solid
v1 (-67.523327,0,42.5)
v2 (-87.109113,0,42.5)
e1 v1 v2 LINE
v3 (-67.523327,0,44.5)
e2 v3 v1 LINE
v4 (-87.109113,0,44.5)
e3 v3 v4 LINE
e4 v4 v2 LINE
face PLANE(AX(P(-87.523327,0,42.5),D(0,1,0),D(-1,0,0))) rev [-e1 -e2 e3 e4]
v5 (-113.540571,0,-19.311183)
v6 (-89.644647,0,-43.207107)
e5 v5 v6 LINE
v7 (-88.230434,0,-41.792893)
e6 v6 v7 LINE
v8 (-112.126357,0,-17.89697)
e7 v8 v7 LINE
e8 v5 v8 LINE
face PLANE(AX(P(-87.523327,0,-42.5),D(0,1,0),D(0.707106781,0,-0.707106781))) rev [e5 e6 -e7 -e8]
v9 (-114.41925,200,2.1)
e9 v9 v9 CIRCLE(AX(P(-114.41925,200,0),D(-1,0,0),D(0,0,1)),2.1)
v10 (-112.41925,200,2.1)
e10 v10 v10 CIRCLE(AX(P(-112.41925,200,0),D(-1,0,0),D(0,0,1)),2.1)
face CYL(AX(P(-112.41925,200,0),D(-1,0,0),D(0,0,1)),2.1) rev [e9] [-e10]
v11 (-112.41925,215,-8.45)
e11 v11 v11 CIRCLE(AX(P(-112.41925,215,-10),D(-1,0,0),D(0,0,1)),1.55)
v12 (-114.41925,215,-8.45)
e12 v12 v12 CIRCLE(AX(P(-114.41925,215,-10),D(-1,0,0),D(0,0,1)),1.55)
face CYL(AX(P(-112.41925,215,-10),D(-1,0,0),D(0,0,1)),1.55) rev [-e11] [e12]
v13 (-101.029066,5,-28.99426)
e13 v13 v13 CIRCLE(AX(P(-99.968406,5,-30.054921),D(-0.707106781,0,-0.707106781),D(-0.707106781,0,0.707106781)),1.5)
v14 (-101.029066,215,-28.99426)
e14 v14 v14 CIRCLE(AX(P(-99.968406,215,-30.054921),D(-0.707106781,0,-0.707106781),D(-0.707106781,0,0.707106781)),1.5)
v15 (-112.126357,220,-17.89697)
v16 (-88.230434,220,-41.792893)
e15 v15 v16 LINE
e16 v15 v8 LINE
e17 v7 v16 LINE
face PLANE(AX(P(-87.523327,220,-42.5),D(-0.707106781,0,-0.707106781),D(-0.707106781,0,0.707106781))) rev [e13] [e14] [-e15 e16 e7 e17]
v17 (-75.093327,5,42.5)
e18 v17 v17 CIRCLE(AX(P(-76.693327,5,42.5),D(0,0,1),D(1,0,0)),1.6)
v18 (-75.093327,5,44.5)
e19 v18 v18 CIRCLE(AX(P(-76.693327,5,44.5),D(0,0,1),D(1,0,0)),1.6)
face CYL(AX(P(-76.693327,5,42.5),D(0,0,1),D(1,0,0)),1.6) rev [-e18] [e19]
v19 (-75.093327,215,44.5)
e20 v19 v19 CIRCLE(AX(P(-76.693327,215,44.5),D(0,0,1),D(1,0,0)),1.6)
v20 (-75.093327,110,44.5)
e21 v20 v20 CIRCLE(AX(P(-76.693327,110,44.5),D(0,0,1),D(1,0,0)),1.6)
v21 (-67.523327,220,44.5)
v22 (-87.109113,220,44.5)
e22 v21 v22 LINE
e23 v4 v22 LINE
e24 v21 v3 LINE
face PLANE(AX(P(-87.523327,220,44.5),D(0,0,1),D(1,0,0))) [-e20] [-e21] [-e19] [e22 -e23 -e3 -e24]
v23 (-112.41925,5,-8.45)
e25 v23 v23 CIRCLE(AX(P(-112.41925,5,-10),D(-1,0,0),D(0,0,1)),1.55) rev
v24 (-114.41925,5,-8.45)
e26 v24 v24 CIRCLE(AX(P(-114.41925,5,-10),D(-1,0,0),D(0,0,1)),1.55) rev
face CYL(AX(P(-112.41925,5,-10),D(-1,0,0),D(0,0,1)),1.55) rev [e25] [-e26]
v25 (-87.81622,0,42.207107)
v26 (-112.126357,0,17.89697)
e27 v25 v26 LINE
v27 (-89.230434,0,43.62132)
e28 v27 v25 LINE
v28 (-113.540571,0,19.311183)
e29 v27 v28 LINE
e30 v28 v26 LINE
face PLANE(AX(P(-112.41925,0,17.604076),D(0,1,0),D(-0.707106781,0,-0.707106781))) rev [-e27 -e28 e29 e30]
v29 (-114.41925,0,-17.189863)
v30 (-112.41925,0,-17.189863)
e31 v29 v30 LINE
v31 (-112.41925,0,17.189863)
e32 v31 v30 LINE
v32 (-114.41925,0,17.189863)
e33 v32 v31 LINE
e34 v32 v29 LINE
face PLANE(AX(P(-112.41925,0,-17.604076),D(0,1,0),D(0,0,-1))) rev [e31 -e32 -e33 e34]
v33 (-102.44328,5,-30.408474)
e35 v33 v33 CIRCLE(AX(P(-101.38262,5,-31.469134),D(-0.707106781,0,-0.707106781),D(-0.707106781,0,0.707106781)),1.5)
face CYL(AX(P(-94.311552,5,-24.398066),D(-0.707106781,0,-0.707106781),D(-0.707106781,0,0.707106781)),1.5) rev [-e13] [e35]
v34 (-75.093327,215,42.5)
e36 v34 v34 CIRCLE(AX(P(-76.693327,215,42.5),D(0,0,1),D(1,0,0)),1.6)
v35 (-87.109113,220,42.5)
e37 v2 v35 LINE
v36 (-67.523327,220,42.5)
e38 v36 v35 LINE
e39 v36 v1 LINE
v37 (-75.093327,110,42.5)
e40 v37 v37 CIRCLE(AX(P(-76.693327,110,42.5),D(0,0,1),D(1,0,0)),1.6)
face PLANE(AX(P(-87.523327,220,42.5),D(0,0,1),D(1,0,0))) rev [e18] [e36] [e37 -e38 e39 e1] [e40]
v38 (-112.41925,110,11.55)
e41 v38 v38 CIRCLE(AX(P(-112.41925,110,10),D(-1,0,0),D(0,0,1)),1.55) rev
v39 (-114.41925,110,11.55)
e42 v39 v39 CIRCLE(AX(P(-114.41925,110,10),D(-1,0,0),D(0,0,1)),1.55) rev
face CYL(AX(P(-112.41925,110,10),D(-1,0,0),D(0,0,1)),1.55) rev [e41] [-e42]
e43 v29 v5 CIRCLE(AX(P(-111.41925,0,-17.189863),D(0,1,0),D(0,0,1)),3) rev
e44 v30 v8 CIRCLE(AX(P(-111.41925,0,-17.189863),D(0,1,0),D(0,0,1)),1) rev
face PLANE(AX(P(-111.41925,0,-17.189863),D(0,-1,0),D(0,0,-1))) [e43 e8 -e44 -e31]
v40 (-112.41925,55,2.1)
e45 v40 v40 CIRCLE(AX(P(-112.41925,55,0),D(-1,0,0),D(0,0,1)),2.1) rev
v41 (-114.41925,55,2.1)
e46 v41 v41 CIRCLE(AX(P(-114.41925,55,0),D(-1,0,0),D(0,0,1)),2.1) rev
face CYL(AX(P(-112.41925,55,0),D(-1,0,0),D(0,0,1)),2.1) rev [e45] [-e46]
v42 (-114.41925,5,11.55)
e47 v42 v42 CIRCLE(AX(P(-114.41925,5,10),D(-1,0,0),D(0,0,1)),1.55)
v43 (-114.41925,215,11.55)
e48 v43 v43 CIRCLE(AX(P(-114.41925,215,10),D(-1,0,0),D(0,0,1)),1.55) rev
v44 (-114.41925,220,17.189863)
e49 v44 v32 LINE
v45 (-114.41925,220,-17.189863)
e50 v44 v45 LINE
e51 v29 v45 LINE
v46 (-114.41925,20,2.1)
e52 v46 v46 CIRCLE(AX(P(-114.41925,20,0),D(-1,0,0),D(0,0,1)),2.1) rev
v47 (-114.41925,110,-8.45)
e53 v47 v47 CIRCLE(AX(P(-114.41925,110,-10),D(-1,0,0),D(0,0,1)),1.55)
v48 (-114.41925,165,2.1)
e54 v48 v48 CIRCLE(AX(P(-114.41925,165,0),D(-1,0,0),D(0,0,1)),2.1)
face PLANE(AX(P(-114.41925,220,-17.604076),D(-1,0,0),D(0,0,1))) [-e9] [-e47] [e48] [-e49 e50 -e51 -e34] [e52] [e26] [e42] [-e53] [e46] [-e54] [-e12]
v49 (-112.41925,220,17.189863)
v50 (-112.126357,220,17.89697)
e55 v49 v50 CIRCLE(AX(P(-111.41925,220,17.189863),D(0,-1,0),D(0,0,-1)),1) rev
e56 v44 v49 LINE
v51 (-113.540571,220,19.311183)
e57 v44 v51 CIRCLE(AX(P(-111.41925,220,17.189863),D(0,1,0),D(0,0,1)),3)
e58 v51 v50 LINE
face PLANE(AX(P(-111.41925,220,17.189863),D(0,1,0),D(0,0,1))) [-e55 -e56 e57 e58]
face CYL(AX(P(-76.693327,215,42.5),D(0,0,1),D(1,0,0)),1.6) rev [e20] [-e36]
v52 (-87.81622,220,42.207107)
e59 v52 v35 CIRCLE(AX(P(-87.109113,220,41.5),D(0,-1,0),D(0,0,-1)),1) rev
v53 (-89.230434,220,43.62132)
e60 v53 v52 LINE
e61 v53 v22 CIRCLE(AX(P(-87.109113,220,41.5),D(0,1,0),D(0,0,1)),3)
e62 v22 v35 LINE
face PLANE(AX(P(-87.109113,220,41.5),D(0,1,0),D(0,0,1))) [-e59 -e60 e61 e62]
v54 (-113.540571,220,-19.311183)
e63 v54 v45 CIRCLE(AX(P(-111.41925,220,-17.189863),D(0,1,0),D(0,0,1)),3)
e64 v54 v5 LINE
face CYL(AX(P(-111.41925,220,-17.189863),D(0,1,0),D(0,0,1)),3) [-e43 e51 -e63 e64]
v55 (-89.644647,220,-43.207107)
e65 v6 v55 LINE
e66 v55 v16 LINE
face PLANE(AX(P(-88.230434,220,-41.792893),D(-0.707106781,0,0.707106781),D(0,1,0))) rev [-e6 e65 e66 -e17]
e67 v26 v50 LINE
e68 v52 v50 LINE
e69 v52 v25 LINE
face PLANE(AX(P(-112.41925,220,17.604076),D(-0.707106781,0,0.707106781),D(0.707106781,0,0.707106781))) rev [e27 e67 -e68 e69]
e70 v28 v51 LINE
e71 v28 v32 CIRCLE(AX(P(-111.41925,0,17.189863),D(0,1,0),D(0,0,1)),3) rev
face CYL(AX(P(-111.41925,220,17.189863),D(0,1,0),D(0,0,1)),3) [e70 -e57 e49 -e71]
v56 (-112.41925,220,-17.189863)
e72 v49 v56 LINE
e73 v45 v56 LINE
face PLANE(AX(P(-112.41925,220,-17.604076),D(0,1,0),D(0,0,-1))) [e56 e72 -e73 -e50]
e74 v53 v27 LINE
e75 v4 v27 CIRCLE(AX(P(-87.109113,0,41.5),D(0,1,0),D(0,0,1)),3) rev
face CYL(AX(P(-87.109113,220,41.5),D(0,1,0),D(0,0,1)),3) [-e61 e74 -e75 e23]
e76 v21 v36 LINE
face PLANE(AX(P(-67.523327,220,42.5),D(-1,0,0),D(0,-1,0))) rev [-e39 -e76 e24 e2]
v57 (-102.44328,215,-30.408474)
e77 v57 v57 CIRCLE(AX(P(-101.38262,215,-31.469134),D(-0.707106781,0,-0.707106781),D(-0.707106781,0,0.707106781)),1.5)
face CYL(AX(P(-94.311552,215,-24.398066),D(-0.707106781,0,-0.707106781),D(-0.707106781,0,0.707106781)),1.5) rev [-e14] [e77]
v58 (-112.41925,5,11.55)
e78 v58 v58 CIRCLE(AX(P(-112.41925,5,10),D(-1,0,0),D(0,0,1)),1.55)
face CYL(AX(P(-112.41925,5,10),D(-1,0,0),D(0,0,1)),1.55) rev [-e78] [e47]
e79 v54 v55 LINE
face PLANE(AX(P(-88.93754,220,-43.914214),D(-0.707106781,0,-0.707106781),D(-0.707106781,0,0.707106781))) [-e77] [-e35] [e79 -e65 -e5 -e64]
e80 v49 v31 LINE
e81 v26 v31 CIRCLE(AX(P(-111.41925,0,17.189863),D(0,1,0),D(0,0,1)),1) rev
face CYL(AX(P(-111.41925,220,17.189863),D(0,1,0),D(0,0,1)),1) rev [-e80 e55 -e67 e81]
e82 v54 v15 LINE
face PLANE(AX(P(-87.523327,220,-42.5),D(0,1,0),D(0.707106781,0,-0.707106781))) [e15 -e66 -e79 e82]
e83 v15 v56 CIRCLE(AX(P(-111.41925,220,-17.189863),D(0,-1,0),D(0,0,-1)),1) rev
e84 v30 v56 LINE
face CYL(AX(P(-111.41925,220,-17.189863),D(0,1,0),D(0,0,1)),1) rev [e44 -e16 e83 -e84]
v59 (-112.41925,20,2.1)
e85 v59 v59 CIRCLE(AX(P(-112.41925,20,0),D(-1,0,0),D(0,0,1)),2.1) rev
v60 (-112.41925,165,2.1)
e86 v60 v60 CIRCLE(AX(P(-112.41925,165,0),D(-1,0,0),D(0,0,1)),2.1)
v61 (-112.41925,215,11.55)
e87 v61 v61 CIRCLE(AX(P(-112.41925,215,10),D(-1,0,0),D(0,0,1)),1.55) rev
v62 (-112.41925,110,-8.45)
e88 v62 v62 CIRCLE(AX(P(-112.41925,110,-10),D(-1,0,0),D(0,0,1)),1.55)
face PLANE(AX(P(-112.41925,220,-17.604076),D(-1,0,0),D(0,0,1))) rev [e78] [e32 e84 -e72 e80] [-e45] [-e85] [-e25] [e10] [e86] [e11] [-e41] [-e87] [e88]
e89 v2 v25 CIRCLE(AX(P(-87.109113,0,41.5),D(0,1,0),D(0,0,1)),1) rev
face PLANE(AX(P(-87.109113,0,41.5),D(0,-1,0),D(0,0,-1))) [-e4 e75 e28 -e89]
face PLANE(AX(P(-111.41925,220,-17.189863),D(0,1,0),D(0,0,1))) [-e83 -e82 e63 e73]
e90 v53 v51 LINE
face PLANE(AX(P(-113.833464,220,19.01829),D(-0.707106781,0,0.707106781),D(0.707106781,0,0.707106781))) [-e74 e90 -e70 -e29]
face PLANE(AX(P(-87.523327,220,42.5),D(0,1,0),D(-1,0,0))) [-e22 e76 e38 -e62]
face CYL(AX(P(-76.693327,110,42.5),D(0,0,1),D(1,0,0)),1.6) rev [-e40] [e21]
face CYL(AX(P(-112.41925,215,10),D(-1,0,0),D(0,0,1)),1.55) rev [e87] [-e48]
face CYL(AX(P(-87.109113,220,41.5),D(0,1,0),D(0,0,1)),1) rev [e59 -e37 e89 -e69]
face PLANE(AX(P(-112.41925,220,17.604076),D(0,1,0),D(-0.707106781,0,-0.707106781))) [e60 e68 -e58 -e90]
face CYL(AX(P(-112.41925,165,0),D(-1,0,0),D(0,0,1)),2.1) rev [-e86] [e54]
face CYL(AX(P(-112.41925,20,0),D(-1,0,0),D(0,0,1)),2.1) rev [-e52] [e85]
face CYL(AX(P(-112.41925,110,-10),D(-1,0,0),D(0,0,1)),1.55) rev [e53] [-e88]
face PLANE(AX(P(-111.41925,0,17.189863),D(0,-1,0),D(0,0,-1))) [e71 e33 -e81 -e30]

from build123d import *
from build123d.topology import SkipClean

# Parameters (mm, degrees)
EXTRUDE_1_DEPTH             = 220
SKETCH_3_R                  = 1.55
SKETCH_3_R_2                = 2.1
CUT_EXTRUDE_1_DEPTH         = 10
SKETCH_6_R                  = 1.6
CUT_EXTRUDE_2_DEPTH         = 10
CHAMFER_1_SIZE              = 1
CHAMFER_1_SIZE2             = 0.707106781
SHEET_START                 = -114.419250373
SHEET_METAL_2_OUTLINE_W     = 220
SHEET_METAL_2_OUTLINE_H     = 86.5
SHEET_METAL_2_OUTLINE_R     = 1.55
SHEET_METAL_2_OUTLINE_R_2   = 2.1
SHEET_METAL_2_DEPTH         = 26.274603255
SHEET_START_2               = -87.816219993
SHEET_METAL_2_2_OUTLINE_W   = 220
SHEET_METAL_2_2_OUTLINE_H   = 87
SHEET_METAL_2_2_OUTLINE_R   = 1.55
SHEET_METAL_2_2_OUTLINE_R_2 = 2.1
SHEET_METAL_2_2_DEPTH       = 0.483052927
SHEET_START_3               = -89.230433555
SHEET_METAL_2_3_OUTLINE_W   = 220
SHEET_METAL_2_3_OUTLINE_H   = 0.5
SHEET_METAL_2_3_DEPTH       = 21.707106781
SHEET_METAL_2_4_DEPTH       = 220
SHEET_METAL_2_5_DEPTH       = 220
SHEET_START_4               = 44
SHEET_METAL_2_6_OUTLINE_R   = 1.6
SHEET_METAL_2_6_DEPTH       = 0.5
SKETCH_7_R                  = 1.5
CUT_EXTRUDE_3_DEPTH         = 10


with BuildPart() as part:
    # 草图2 → 凸台-拉伸1 (new body)
    with BuildSketch(Plane(origin=(0, 0, 0), x_dir=(1, 0, 0), z_dir=(0, 1, 0))):
        Polygon((-87.523326774, 42.5), (-112.419250373, 17.604076401), (-112.419250373, -17.604076401), (-87.523326774, -42.5), (-67.523326774, -42.5), (-67.523326774, -44), (-88.144647118, -44), (-113.919250373, -18.225396744), (-113.919250373, 18.225396744), (-89.644647118, 42.5), align=None)
    extrude(amount=EXTRUDE_1_DEPTH)

    # Sketch 3 → 切除-拉伸1 (cut)
    with BuildSketch(Plane.ZY.offset(113.919250373)):
        with Locations((-10, 5)):
            Circle(SKETCH_3_R)
        with Locations((10, 5)):
            Circle(SKETCH_3_R)
        with BuildLine():
            ThreePointArc((-8.45, 110), (-10, 111.55), (-11.55, 110))
            Line((-11.55, 110), (-8.45, 110))
        make_face()
        with BuildLine():
            Line((-8.45, 110), (-11.55, 110))
            ThreePointArc((-11.55, 110), (-10, 108.45), (-8.45, 110))
        make_face()
        with BuildLine():
            ThreePointArc((8.45, 110), (10, 108.45), (11.55, 110))
            Line((11.55, 110), (8.45, 110))
        make_face()
        with BuildLine():
            Line((8.45, 110), (11.55, 110))
            ThreePointArc((11.55, 110), (10, 111.55), (8.45, 110))
        make_face()
        with Locations((-10, 215)):
            Circle(SKETCH_3_R)
        with Locations((10, 215)):
            Circle(SKETCH_3_R)
        with Locations((0, 200)):
            Circle(SKETCH_3_R_2)
        with Locations((0, 165)):
            Circle(SKETCH_3_R_2)
        with Locations((0, 55)):
            Circle(SKETCH_3_R_2)
        with Locations((0, 20)):
            Circle(SKETCH_3_R_2)
    extrude(amount=-CUT_EXTRUDE_1_DEPTH, mode=Mode.SUBTRACT)

    # 草图6 → 切除-拉伸2 (cut)
    with BuildSketch(Plane.XY.offset(44)):
        with Locations((-76.693326774, 5)):
            Circle(SKETCH_6_R)
        with Locations((-76.693326774, 110)):
            Circle(SKETCH_6_R)
        with Locations((-76.693326774, 215)):
            Circle(SKETCH_6_R)
    extrude(amount=-CUT_EXTRUDE_2_DEPTH, mode=Mode.SUBTRACT)

    # 倒角1
    chamfer_1_edges = [part.edges().sort_by_distance(p)[0] for p in [
        (-87.523326774, 110, -42.5),
    ]]
    chamfer_1_side = [part.faces().sort_by_distance(p)[0] for p in [
        (-99.971288574, 110, -30.0520382),
    ]]
    chamfer(chamfer_1_edges, length=CHAMFER_1_SIZE, length2=CHAMFER_1_SIZE2, reference=chamfer_1_side[0])

    # Sheet Metal 2: read off the stored shape, not the designer's step
    # Sheet Metal 2 outline → Sheet Metal 2 (add)
    with SkipClean():  # the faces are left unmerged after this step: merging them gives an invalid solid
        with BuildSketch(Plane.YZ.offset(SHEET_START)):
            with Locations((110, 0.75)):
                Rectangle(SHEET_METAL_2_OUTLINE_W, SHEET_METAL_2_OUTLINE_H)
            with Locations((5, -10)):
                Circle(SHEET_METAL_2_OUTLINE_R, mode=Mode.SUBTRACT)
            with Locations((20, 0)):
                Circle(SHEET_METAL_2_OUTLINE_R_2, mode=Mode.SUBTRACT)
            with Locations((55, 0)):
                Circle(SHEET_METAL_2_OUTLINE_R_2, mode=Mode.SUBTRACT)
            with Locations((110, -10)):
                Circle(SHEET_METAL_2_OUTLINE_R, mode=Mode.SUBTRACT)
            with Locations((215, -10)):
                Circle(SHEET_METAL_2_OUTLINE_R, mode=Mode.SUBTRACT)
            with Locations((165, 0)):
                Circle(SHEET_METAL_2_OUTLINE_R_2, mode=Mode.SUBTRACT)
            with Locations((200, 0)):
                Circle(SHEET_METAL_2_OUTLINE_R_2, mode=Mode.SUBTRACT)
            with Locations((5, 10)):
                Circle(SHEET_METAL_2_OUTLINE_R, mode=Mode.SUBTRACT)
            with Locations((110, 10)):
                Circle(SHEET_METAL_2_OUTLINE_R, mode=Mode.SUBTRACT)
            with Locations((215, 10)):
                Circle(SHEET_METAL_2_OUTLINE_R, mode=Mode.SUBTRACT)
        extrude(amount=SHEET_METAL_2_DEPTH)

    # Sheet Metal 2 2 outline → Sheet Metal 2 2 (add)
    with SkipClean():  # the faces are left unmerged after this step: merging them gives an invalid solid
        with BuildSketch(Plane.YZ.offset(SHEET_START_2)):
            with Locations((110, 1)):
                Rectangle(SHEET_METAL_2_2_OUTLINE_W, SHEET_METAL_2_2_OUTLINE_H)
            with Locations((5, -10)):
                Circle(SHEET_METAL_2_2_OUTLINE_R, mode=Mode.SUBTRACT)
            with Locations((20, 0)):
                Circle(SHEET_METAL_2_2_OUTLINE_R_2, mode=Mode.SUBTRACT)
            with Locations((55, 0)):
                Circle(SHEET_METAL_2_2_OUTLINE_R_2, mode=Mode.SUBTRACT)
            with Locations((110, -10)):
                Circle(SHEET_METAL_2_2_OUTLINE_R, mode=Mode.SUBTRACT)
            with Locations((215, -10)):
                Circle(SHEET_METAL_2_2_OUTLINE_R, mode=Mode.SUBTRACT)
            with Locations((165, 0)):
                Circle(SHEET_METAL_2_2_OUTLINE_R_2, mode=Mode.SUBTRACT)
            with Locations((200, 0)):
                Circle(SHEET_METAL_2_2_OUTLINE_R_2, mode=Mode.SUBTRACT)
            with Locations((5, 10)):
                Circle(SHEET_METAL_2_2_OUTLINE_R, mode=Mode.SUBTRACT)
            with Locations((110, 10)):
                Circle(SHEET_METAL_2_2_OUTLINE_R, mode=Mode.SUBTRACT)
            with Locations((215, 10)):
                Circle(SHEET_METAL_2_2_OUTLINE_R, mode=Mode.SUBTRACT)
        extrude(amount=SHEET_METAL_2_2_DEPTH)

    # Sheet Metal 2 3 outline → Sheet Metal 2 3 (add)
    with SkipClean():  # the faces are left unmerged after this step: merging them gives an invalid solid
        with BuildSketch(Plane.YZ.offset(SHEET_START_3)):
            with Locations((110, 44.25)):
                Rectangle(SHEET_METAL_2_3_OUTLINE_W, SHEET_METAL_2_3_OUTLINE_H)
        extrude(amount=SHEET_METAL_2_3_DEPTH)

    # Sheet Metal 2 4 outline → Sheet Metal 2 4 (cut)
    with BuildSketch(Plane(origin=(0, 0, 0), x_dir=(1, 0, 0), z_dir=(0, 1, 0))):
        with BuildLine():
            Line((-87.816219993, 42.5), (-87.816219993, -42.207106781))
            ThreePointArc((-87.816219993, -42.207106781), (-87.593520149, -42.374842797), (-87.333167066, -42.474576765))
            Line((-87.333167066, -42.474576765), (-87.333167066, 42.5))
            Line((-87.333167066, 42.5), (-87.816219993, 42.5))
        make_face()
        with BuildLine():
            Line((-88.144647118, 42.5), (-88.937540337, 42.5))
            Line((-88.937540337, 42.5), (-88.230433555, 41.792893219))
            Line((-88.230433555, 41.792893219), (-112.126357154, 17.89696962))
            ThreePointArc((-112.126357154, 17.89696962), (-112.343129906, 17.572546271), (-112.419250373, 17.189862838))
            Line((-112.419250373, 17.189862838), (-112.419250373, -17.189862838))
            ThreePointArc((-112.419250373, -17.189862838), (-112.343129906, -17.572546271), (-112.126357154, -17.89696962))
            Line((-112.126357154, -17.89696962), (-88.144647118, -41.878679656))
            Line((-88.144647118, -41.878679656), (-88.144647118, 42.5))
        make_face()
        with BuildLine():
            ThreePointArc((-113.540570717, -19.311183182), (-114.190888971, -18.337913135), (-114.419250373, -17.189862838))
            Line((-114.419250373, -17.189862838), (-114.419250373, -44))
            Line((-114.419250373, -44), (-89.230433555, -44))
            Line((-89.230433555, -44), (-89.230433555, -44.5))
            Line((-89.230433555, -44.5), (-87.109113212, -44.5))
            ThreePointArc((-87.109113212, -44.5), (-88.257163509, -44.271638598), (-89.230433555, -43.621320344))
            Line((-89.230433555, -43.621320344), (-113.540570717, -19.311183182))
        make_face()
        with BuildLine():
            Line((-113.540570717, 19.311183182), (-90.351753899, 42.5))
            Line((-90.351753899, 42.5), (-114.419250373, 42.5))
            Line((-114.419250373, 42.5), (-114.419250373, 17.189862838))
            ThreePointArc((-114.419250373, 17.189862838), (-114.190888971, 18.337913135), (-113.540570717, 19.311183182))
        make_face()
    extrude(amount=SHEET_METAL_2_4_DEPTH, mode=Mode.SUBTRACT)

    # Sheet Metal 2 5 outline → Sheet Metal 2 5 (add)
    with BuildSketch(Plane(origin=(0, 0, 0), x_dir=(1, 0, 0), z_dir=(0, 1, 0))):
        with BuildLine():
            ThreePointArc((-87.109113212, -42.5), (-87.221859022, -42.493623864), (-87.333167066, -42.474576765))
            Line((-87.333167066, -42.474576765), (-87.333167066, -42.5))
            Line((-87.333167066, -42.5), (-87.109113212, -42.5))
        make_face()
        Polygon((-88.937540337, 42.5), (-89.644647118, 43.207106781), (-90.351753899, 42.5), align=None)
    extrude(amount=SHEET_METAL_2_5_DEPTH)

    # Sheet Metal 2 6 outline → Sheet Metal 2 6 (cut)
    with BuildSketch(Plane.XY.offset(SHEET_START_4)):
        with Locations((-76.693326774, 5)):
            Circle(SHEET_METAL_2_6_OUTLINE_R)
        with Locations((-76.693326774, 110)):
            Circle(SHEET_METAL_2_6_OUTLINE_R)
        with Locations((-76.693326774, 215)):
            Circle(SHEET_METAL_2_6_OUTLINE_R)
    extrude(amount=SHEET_METAL_2_6_DEPTH, mode=Mode.SUBTRACT)

    # 草图7 → 切除-拉伸3 (cut)
    with BuildSketch(Plane(origin=(-66.425876949, 0, -66.425876949), x_dir=(-0.7071067811865474, 0, 0.7071067811865477), z_dir=(-0.7071067811865477, 0, -0.7071067811865474))):
        with Locations((49.436299673, 215)):
            Circle(SKETCH_7_R)
        with Locations((49.436299673, 5)):
            Circle(SKETCH_7_R)
    extrude(amount=-CUT_EXTRUDE_3_DEPTH, mode=Mode.SUBTRACT)


solid = part.part
